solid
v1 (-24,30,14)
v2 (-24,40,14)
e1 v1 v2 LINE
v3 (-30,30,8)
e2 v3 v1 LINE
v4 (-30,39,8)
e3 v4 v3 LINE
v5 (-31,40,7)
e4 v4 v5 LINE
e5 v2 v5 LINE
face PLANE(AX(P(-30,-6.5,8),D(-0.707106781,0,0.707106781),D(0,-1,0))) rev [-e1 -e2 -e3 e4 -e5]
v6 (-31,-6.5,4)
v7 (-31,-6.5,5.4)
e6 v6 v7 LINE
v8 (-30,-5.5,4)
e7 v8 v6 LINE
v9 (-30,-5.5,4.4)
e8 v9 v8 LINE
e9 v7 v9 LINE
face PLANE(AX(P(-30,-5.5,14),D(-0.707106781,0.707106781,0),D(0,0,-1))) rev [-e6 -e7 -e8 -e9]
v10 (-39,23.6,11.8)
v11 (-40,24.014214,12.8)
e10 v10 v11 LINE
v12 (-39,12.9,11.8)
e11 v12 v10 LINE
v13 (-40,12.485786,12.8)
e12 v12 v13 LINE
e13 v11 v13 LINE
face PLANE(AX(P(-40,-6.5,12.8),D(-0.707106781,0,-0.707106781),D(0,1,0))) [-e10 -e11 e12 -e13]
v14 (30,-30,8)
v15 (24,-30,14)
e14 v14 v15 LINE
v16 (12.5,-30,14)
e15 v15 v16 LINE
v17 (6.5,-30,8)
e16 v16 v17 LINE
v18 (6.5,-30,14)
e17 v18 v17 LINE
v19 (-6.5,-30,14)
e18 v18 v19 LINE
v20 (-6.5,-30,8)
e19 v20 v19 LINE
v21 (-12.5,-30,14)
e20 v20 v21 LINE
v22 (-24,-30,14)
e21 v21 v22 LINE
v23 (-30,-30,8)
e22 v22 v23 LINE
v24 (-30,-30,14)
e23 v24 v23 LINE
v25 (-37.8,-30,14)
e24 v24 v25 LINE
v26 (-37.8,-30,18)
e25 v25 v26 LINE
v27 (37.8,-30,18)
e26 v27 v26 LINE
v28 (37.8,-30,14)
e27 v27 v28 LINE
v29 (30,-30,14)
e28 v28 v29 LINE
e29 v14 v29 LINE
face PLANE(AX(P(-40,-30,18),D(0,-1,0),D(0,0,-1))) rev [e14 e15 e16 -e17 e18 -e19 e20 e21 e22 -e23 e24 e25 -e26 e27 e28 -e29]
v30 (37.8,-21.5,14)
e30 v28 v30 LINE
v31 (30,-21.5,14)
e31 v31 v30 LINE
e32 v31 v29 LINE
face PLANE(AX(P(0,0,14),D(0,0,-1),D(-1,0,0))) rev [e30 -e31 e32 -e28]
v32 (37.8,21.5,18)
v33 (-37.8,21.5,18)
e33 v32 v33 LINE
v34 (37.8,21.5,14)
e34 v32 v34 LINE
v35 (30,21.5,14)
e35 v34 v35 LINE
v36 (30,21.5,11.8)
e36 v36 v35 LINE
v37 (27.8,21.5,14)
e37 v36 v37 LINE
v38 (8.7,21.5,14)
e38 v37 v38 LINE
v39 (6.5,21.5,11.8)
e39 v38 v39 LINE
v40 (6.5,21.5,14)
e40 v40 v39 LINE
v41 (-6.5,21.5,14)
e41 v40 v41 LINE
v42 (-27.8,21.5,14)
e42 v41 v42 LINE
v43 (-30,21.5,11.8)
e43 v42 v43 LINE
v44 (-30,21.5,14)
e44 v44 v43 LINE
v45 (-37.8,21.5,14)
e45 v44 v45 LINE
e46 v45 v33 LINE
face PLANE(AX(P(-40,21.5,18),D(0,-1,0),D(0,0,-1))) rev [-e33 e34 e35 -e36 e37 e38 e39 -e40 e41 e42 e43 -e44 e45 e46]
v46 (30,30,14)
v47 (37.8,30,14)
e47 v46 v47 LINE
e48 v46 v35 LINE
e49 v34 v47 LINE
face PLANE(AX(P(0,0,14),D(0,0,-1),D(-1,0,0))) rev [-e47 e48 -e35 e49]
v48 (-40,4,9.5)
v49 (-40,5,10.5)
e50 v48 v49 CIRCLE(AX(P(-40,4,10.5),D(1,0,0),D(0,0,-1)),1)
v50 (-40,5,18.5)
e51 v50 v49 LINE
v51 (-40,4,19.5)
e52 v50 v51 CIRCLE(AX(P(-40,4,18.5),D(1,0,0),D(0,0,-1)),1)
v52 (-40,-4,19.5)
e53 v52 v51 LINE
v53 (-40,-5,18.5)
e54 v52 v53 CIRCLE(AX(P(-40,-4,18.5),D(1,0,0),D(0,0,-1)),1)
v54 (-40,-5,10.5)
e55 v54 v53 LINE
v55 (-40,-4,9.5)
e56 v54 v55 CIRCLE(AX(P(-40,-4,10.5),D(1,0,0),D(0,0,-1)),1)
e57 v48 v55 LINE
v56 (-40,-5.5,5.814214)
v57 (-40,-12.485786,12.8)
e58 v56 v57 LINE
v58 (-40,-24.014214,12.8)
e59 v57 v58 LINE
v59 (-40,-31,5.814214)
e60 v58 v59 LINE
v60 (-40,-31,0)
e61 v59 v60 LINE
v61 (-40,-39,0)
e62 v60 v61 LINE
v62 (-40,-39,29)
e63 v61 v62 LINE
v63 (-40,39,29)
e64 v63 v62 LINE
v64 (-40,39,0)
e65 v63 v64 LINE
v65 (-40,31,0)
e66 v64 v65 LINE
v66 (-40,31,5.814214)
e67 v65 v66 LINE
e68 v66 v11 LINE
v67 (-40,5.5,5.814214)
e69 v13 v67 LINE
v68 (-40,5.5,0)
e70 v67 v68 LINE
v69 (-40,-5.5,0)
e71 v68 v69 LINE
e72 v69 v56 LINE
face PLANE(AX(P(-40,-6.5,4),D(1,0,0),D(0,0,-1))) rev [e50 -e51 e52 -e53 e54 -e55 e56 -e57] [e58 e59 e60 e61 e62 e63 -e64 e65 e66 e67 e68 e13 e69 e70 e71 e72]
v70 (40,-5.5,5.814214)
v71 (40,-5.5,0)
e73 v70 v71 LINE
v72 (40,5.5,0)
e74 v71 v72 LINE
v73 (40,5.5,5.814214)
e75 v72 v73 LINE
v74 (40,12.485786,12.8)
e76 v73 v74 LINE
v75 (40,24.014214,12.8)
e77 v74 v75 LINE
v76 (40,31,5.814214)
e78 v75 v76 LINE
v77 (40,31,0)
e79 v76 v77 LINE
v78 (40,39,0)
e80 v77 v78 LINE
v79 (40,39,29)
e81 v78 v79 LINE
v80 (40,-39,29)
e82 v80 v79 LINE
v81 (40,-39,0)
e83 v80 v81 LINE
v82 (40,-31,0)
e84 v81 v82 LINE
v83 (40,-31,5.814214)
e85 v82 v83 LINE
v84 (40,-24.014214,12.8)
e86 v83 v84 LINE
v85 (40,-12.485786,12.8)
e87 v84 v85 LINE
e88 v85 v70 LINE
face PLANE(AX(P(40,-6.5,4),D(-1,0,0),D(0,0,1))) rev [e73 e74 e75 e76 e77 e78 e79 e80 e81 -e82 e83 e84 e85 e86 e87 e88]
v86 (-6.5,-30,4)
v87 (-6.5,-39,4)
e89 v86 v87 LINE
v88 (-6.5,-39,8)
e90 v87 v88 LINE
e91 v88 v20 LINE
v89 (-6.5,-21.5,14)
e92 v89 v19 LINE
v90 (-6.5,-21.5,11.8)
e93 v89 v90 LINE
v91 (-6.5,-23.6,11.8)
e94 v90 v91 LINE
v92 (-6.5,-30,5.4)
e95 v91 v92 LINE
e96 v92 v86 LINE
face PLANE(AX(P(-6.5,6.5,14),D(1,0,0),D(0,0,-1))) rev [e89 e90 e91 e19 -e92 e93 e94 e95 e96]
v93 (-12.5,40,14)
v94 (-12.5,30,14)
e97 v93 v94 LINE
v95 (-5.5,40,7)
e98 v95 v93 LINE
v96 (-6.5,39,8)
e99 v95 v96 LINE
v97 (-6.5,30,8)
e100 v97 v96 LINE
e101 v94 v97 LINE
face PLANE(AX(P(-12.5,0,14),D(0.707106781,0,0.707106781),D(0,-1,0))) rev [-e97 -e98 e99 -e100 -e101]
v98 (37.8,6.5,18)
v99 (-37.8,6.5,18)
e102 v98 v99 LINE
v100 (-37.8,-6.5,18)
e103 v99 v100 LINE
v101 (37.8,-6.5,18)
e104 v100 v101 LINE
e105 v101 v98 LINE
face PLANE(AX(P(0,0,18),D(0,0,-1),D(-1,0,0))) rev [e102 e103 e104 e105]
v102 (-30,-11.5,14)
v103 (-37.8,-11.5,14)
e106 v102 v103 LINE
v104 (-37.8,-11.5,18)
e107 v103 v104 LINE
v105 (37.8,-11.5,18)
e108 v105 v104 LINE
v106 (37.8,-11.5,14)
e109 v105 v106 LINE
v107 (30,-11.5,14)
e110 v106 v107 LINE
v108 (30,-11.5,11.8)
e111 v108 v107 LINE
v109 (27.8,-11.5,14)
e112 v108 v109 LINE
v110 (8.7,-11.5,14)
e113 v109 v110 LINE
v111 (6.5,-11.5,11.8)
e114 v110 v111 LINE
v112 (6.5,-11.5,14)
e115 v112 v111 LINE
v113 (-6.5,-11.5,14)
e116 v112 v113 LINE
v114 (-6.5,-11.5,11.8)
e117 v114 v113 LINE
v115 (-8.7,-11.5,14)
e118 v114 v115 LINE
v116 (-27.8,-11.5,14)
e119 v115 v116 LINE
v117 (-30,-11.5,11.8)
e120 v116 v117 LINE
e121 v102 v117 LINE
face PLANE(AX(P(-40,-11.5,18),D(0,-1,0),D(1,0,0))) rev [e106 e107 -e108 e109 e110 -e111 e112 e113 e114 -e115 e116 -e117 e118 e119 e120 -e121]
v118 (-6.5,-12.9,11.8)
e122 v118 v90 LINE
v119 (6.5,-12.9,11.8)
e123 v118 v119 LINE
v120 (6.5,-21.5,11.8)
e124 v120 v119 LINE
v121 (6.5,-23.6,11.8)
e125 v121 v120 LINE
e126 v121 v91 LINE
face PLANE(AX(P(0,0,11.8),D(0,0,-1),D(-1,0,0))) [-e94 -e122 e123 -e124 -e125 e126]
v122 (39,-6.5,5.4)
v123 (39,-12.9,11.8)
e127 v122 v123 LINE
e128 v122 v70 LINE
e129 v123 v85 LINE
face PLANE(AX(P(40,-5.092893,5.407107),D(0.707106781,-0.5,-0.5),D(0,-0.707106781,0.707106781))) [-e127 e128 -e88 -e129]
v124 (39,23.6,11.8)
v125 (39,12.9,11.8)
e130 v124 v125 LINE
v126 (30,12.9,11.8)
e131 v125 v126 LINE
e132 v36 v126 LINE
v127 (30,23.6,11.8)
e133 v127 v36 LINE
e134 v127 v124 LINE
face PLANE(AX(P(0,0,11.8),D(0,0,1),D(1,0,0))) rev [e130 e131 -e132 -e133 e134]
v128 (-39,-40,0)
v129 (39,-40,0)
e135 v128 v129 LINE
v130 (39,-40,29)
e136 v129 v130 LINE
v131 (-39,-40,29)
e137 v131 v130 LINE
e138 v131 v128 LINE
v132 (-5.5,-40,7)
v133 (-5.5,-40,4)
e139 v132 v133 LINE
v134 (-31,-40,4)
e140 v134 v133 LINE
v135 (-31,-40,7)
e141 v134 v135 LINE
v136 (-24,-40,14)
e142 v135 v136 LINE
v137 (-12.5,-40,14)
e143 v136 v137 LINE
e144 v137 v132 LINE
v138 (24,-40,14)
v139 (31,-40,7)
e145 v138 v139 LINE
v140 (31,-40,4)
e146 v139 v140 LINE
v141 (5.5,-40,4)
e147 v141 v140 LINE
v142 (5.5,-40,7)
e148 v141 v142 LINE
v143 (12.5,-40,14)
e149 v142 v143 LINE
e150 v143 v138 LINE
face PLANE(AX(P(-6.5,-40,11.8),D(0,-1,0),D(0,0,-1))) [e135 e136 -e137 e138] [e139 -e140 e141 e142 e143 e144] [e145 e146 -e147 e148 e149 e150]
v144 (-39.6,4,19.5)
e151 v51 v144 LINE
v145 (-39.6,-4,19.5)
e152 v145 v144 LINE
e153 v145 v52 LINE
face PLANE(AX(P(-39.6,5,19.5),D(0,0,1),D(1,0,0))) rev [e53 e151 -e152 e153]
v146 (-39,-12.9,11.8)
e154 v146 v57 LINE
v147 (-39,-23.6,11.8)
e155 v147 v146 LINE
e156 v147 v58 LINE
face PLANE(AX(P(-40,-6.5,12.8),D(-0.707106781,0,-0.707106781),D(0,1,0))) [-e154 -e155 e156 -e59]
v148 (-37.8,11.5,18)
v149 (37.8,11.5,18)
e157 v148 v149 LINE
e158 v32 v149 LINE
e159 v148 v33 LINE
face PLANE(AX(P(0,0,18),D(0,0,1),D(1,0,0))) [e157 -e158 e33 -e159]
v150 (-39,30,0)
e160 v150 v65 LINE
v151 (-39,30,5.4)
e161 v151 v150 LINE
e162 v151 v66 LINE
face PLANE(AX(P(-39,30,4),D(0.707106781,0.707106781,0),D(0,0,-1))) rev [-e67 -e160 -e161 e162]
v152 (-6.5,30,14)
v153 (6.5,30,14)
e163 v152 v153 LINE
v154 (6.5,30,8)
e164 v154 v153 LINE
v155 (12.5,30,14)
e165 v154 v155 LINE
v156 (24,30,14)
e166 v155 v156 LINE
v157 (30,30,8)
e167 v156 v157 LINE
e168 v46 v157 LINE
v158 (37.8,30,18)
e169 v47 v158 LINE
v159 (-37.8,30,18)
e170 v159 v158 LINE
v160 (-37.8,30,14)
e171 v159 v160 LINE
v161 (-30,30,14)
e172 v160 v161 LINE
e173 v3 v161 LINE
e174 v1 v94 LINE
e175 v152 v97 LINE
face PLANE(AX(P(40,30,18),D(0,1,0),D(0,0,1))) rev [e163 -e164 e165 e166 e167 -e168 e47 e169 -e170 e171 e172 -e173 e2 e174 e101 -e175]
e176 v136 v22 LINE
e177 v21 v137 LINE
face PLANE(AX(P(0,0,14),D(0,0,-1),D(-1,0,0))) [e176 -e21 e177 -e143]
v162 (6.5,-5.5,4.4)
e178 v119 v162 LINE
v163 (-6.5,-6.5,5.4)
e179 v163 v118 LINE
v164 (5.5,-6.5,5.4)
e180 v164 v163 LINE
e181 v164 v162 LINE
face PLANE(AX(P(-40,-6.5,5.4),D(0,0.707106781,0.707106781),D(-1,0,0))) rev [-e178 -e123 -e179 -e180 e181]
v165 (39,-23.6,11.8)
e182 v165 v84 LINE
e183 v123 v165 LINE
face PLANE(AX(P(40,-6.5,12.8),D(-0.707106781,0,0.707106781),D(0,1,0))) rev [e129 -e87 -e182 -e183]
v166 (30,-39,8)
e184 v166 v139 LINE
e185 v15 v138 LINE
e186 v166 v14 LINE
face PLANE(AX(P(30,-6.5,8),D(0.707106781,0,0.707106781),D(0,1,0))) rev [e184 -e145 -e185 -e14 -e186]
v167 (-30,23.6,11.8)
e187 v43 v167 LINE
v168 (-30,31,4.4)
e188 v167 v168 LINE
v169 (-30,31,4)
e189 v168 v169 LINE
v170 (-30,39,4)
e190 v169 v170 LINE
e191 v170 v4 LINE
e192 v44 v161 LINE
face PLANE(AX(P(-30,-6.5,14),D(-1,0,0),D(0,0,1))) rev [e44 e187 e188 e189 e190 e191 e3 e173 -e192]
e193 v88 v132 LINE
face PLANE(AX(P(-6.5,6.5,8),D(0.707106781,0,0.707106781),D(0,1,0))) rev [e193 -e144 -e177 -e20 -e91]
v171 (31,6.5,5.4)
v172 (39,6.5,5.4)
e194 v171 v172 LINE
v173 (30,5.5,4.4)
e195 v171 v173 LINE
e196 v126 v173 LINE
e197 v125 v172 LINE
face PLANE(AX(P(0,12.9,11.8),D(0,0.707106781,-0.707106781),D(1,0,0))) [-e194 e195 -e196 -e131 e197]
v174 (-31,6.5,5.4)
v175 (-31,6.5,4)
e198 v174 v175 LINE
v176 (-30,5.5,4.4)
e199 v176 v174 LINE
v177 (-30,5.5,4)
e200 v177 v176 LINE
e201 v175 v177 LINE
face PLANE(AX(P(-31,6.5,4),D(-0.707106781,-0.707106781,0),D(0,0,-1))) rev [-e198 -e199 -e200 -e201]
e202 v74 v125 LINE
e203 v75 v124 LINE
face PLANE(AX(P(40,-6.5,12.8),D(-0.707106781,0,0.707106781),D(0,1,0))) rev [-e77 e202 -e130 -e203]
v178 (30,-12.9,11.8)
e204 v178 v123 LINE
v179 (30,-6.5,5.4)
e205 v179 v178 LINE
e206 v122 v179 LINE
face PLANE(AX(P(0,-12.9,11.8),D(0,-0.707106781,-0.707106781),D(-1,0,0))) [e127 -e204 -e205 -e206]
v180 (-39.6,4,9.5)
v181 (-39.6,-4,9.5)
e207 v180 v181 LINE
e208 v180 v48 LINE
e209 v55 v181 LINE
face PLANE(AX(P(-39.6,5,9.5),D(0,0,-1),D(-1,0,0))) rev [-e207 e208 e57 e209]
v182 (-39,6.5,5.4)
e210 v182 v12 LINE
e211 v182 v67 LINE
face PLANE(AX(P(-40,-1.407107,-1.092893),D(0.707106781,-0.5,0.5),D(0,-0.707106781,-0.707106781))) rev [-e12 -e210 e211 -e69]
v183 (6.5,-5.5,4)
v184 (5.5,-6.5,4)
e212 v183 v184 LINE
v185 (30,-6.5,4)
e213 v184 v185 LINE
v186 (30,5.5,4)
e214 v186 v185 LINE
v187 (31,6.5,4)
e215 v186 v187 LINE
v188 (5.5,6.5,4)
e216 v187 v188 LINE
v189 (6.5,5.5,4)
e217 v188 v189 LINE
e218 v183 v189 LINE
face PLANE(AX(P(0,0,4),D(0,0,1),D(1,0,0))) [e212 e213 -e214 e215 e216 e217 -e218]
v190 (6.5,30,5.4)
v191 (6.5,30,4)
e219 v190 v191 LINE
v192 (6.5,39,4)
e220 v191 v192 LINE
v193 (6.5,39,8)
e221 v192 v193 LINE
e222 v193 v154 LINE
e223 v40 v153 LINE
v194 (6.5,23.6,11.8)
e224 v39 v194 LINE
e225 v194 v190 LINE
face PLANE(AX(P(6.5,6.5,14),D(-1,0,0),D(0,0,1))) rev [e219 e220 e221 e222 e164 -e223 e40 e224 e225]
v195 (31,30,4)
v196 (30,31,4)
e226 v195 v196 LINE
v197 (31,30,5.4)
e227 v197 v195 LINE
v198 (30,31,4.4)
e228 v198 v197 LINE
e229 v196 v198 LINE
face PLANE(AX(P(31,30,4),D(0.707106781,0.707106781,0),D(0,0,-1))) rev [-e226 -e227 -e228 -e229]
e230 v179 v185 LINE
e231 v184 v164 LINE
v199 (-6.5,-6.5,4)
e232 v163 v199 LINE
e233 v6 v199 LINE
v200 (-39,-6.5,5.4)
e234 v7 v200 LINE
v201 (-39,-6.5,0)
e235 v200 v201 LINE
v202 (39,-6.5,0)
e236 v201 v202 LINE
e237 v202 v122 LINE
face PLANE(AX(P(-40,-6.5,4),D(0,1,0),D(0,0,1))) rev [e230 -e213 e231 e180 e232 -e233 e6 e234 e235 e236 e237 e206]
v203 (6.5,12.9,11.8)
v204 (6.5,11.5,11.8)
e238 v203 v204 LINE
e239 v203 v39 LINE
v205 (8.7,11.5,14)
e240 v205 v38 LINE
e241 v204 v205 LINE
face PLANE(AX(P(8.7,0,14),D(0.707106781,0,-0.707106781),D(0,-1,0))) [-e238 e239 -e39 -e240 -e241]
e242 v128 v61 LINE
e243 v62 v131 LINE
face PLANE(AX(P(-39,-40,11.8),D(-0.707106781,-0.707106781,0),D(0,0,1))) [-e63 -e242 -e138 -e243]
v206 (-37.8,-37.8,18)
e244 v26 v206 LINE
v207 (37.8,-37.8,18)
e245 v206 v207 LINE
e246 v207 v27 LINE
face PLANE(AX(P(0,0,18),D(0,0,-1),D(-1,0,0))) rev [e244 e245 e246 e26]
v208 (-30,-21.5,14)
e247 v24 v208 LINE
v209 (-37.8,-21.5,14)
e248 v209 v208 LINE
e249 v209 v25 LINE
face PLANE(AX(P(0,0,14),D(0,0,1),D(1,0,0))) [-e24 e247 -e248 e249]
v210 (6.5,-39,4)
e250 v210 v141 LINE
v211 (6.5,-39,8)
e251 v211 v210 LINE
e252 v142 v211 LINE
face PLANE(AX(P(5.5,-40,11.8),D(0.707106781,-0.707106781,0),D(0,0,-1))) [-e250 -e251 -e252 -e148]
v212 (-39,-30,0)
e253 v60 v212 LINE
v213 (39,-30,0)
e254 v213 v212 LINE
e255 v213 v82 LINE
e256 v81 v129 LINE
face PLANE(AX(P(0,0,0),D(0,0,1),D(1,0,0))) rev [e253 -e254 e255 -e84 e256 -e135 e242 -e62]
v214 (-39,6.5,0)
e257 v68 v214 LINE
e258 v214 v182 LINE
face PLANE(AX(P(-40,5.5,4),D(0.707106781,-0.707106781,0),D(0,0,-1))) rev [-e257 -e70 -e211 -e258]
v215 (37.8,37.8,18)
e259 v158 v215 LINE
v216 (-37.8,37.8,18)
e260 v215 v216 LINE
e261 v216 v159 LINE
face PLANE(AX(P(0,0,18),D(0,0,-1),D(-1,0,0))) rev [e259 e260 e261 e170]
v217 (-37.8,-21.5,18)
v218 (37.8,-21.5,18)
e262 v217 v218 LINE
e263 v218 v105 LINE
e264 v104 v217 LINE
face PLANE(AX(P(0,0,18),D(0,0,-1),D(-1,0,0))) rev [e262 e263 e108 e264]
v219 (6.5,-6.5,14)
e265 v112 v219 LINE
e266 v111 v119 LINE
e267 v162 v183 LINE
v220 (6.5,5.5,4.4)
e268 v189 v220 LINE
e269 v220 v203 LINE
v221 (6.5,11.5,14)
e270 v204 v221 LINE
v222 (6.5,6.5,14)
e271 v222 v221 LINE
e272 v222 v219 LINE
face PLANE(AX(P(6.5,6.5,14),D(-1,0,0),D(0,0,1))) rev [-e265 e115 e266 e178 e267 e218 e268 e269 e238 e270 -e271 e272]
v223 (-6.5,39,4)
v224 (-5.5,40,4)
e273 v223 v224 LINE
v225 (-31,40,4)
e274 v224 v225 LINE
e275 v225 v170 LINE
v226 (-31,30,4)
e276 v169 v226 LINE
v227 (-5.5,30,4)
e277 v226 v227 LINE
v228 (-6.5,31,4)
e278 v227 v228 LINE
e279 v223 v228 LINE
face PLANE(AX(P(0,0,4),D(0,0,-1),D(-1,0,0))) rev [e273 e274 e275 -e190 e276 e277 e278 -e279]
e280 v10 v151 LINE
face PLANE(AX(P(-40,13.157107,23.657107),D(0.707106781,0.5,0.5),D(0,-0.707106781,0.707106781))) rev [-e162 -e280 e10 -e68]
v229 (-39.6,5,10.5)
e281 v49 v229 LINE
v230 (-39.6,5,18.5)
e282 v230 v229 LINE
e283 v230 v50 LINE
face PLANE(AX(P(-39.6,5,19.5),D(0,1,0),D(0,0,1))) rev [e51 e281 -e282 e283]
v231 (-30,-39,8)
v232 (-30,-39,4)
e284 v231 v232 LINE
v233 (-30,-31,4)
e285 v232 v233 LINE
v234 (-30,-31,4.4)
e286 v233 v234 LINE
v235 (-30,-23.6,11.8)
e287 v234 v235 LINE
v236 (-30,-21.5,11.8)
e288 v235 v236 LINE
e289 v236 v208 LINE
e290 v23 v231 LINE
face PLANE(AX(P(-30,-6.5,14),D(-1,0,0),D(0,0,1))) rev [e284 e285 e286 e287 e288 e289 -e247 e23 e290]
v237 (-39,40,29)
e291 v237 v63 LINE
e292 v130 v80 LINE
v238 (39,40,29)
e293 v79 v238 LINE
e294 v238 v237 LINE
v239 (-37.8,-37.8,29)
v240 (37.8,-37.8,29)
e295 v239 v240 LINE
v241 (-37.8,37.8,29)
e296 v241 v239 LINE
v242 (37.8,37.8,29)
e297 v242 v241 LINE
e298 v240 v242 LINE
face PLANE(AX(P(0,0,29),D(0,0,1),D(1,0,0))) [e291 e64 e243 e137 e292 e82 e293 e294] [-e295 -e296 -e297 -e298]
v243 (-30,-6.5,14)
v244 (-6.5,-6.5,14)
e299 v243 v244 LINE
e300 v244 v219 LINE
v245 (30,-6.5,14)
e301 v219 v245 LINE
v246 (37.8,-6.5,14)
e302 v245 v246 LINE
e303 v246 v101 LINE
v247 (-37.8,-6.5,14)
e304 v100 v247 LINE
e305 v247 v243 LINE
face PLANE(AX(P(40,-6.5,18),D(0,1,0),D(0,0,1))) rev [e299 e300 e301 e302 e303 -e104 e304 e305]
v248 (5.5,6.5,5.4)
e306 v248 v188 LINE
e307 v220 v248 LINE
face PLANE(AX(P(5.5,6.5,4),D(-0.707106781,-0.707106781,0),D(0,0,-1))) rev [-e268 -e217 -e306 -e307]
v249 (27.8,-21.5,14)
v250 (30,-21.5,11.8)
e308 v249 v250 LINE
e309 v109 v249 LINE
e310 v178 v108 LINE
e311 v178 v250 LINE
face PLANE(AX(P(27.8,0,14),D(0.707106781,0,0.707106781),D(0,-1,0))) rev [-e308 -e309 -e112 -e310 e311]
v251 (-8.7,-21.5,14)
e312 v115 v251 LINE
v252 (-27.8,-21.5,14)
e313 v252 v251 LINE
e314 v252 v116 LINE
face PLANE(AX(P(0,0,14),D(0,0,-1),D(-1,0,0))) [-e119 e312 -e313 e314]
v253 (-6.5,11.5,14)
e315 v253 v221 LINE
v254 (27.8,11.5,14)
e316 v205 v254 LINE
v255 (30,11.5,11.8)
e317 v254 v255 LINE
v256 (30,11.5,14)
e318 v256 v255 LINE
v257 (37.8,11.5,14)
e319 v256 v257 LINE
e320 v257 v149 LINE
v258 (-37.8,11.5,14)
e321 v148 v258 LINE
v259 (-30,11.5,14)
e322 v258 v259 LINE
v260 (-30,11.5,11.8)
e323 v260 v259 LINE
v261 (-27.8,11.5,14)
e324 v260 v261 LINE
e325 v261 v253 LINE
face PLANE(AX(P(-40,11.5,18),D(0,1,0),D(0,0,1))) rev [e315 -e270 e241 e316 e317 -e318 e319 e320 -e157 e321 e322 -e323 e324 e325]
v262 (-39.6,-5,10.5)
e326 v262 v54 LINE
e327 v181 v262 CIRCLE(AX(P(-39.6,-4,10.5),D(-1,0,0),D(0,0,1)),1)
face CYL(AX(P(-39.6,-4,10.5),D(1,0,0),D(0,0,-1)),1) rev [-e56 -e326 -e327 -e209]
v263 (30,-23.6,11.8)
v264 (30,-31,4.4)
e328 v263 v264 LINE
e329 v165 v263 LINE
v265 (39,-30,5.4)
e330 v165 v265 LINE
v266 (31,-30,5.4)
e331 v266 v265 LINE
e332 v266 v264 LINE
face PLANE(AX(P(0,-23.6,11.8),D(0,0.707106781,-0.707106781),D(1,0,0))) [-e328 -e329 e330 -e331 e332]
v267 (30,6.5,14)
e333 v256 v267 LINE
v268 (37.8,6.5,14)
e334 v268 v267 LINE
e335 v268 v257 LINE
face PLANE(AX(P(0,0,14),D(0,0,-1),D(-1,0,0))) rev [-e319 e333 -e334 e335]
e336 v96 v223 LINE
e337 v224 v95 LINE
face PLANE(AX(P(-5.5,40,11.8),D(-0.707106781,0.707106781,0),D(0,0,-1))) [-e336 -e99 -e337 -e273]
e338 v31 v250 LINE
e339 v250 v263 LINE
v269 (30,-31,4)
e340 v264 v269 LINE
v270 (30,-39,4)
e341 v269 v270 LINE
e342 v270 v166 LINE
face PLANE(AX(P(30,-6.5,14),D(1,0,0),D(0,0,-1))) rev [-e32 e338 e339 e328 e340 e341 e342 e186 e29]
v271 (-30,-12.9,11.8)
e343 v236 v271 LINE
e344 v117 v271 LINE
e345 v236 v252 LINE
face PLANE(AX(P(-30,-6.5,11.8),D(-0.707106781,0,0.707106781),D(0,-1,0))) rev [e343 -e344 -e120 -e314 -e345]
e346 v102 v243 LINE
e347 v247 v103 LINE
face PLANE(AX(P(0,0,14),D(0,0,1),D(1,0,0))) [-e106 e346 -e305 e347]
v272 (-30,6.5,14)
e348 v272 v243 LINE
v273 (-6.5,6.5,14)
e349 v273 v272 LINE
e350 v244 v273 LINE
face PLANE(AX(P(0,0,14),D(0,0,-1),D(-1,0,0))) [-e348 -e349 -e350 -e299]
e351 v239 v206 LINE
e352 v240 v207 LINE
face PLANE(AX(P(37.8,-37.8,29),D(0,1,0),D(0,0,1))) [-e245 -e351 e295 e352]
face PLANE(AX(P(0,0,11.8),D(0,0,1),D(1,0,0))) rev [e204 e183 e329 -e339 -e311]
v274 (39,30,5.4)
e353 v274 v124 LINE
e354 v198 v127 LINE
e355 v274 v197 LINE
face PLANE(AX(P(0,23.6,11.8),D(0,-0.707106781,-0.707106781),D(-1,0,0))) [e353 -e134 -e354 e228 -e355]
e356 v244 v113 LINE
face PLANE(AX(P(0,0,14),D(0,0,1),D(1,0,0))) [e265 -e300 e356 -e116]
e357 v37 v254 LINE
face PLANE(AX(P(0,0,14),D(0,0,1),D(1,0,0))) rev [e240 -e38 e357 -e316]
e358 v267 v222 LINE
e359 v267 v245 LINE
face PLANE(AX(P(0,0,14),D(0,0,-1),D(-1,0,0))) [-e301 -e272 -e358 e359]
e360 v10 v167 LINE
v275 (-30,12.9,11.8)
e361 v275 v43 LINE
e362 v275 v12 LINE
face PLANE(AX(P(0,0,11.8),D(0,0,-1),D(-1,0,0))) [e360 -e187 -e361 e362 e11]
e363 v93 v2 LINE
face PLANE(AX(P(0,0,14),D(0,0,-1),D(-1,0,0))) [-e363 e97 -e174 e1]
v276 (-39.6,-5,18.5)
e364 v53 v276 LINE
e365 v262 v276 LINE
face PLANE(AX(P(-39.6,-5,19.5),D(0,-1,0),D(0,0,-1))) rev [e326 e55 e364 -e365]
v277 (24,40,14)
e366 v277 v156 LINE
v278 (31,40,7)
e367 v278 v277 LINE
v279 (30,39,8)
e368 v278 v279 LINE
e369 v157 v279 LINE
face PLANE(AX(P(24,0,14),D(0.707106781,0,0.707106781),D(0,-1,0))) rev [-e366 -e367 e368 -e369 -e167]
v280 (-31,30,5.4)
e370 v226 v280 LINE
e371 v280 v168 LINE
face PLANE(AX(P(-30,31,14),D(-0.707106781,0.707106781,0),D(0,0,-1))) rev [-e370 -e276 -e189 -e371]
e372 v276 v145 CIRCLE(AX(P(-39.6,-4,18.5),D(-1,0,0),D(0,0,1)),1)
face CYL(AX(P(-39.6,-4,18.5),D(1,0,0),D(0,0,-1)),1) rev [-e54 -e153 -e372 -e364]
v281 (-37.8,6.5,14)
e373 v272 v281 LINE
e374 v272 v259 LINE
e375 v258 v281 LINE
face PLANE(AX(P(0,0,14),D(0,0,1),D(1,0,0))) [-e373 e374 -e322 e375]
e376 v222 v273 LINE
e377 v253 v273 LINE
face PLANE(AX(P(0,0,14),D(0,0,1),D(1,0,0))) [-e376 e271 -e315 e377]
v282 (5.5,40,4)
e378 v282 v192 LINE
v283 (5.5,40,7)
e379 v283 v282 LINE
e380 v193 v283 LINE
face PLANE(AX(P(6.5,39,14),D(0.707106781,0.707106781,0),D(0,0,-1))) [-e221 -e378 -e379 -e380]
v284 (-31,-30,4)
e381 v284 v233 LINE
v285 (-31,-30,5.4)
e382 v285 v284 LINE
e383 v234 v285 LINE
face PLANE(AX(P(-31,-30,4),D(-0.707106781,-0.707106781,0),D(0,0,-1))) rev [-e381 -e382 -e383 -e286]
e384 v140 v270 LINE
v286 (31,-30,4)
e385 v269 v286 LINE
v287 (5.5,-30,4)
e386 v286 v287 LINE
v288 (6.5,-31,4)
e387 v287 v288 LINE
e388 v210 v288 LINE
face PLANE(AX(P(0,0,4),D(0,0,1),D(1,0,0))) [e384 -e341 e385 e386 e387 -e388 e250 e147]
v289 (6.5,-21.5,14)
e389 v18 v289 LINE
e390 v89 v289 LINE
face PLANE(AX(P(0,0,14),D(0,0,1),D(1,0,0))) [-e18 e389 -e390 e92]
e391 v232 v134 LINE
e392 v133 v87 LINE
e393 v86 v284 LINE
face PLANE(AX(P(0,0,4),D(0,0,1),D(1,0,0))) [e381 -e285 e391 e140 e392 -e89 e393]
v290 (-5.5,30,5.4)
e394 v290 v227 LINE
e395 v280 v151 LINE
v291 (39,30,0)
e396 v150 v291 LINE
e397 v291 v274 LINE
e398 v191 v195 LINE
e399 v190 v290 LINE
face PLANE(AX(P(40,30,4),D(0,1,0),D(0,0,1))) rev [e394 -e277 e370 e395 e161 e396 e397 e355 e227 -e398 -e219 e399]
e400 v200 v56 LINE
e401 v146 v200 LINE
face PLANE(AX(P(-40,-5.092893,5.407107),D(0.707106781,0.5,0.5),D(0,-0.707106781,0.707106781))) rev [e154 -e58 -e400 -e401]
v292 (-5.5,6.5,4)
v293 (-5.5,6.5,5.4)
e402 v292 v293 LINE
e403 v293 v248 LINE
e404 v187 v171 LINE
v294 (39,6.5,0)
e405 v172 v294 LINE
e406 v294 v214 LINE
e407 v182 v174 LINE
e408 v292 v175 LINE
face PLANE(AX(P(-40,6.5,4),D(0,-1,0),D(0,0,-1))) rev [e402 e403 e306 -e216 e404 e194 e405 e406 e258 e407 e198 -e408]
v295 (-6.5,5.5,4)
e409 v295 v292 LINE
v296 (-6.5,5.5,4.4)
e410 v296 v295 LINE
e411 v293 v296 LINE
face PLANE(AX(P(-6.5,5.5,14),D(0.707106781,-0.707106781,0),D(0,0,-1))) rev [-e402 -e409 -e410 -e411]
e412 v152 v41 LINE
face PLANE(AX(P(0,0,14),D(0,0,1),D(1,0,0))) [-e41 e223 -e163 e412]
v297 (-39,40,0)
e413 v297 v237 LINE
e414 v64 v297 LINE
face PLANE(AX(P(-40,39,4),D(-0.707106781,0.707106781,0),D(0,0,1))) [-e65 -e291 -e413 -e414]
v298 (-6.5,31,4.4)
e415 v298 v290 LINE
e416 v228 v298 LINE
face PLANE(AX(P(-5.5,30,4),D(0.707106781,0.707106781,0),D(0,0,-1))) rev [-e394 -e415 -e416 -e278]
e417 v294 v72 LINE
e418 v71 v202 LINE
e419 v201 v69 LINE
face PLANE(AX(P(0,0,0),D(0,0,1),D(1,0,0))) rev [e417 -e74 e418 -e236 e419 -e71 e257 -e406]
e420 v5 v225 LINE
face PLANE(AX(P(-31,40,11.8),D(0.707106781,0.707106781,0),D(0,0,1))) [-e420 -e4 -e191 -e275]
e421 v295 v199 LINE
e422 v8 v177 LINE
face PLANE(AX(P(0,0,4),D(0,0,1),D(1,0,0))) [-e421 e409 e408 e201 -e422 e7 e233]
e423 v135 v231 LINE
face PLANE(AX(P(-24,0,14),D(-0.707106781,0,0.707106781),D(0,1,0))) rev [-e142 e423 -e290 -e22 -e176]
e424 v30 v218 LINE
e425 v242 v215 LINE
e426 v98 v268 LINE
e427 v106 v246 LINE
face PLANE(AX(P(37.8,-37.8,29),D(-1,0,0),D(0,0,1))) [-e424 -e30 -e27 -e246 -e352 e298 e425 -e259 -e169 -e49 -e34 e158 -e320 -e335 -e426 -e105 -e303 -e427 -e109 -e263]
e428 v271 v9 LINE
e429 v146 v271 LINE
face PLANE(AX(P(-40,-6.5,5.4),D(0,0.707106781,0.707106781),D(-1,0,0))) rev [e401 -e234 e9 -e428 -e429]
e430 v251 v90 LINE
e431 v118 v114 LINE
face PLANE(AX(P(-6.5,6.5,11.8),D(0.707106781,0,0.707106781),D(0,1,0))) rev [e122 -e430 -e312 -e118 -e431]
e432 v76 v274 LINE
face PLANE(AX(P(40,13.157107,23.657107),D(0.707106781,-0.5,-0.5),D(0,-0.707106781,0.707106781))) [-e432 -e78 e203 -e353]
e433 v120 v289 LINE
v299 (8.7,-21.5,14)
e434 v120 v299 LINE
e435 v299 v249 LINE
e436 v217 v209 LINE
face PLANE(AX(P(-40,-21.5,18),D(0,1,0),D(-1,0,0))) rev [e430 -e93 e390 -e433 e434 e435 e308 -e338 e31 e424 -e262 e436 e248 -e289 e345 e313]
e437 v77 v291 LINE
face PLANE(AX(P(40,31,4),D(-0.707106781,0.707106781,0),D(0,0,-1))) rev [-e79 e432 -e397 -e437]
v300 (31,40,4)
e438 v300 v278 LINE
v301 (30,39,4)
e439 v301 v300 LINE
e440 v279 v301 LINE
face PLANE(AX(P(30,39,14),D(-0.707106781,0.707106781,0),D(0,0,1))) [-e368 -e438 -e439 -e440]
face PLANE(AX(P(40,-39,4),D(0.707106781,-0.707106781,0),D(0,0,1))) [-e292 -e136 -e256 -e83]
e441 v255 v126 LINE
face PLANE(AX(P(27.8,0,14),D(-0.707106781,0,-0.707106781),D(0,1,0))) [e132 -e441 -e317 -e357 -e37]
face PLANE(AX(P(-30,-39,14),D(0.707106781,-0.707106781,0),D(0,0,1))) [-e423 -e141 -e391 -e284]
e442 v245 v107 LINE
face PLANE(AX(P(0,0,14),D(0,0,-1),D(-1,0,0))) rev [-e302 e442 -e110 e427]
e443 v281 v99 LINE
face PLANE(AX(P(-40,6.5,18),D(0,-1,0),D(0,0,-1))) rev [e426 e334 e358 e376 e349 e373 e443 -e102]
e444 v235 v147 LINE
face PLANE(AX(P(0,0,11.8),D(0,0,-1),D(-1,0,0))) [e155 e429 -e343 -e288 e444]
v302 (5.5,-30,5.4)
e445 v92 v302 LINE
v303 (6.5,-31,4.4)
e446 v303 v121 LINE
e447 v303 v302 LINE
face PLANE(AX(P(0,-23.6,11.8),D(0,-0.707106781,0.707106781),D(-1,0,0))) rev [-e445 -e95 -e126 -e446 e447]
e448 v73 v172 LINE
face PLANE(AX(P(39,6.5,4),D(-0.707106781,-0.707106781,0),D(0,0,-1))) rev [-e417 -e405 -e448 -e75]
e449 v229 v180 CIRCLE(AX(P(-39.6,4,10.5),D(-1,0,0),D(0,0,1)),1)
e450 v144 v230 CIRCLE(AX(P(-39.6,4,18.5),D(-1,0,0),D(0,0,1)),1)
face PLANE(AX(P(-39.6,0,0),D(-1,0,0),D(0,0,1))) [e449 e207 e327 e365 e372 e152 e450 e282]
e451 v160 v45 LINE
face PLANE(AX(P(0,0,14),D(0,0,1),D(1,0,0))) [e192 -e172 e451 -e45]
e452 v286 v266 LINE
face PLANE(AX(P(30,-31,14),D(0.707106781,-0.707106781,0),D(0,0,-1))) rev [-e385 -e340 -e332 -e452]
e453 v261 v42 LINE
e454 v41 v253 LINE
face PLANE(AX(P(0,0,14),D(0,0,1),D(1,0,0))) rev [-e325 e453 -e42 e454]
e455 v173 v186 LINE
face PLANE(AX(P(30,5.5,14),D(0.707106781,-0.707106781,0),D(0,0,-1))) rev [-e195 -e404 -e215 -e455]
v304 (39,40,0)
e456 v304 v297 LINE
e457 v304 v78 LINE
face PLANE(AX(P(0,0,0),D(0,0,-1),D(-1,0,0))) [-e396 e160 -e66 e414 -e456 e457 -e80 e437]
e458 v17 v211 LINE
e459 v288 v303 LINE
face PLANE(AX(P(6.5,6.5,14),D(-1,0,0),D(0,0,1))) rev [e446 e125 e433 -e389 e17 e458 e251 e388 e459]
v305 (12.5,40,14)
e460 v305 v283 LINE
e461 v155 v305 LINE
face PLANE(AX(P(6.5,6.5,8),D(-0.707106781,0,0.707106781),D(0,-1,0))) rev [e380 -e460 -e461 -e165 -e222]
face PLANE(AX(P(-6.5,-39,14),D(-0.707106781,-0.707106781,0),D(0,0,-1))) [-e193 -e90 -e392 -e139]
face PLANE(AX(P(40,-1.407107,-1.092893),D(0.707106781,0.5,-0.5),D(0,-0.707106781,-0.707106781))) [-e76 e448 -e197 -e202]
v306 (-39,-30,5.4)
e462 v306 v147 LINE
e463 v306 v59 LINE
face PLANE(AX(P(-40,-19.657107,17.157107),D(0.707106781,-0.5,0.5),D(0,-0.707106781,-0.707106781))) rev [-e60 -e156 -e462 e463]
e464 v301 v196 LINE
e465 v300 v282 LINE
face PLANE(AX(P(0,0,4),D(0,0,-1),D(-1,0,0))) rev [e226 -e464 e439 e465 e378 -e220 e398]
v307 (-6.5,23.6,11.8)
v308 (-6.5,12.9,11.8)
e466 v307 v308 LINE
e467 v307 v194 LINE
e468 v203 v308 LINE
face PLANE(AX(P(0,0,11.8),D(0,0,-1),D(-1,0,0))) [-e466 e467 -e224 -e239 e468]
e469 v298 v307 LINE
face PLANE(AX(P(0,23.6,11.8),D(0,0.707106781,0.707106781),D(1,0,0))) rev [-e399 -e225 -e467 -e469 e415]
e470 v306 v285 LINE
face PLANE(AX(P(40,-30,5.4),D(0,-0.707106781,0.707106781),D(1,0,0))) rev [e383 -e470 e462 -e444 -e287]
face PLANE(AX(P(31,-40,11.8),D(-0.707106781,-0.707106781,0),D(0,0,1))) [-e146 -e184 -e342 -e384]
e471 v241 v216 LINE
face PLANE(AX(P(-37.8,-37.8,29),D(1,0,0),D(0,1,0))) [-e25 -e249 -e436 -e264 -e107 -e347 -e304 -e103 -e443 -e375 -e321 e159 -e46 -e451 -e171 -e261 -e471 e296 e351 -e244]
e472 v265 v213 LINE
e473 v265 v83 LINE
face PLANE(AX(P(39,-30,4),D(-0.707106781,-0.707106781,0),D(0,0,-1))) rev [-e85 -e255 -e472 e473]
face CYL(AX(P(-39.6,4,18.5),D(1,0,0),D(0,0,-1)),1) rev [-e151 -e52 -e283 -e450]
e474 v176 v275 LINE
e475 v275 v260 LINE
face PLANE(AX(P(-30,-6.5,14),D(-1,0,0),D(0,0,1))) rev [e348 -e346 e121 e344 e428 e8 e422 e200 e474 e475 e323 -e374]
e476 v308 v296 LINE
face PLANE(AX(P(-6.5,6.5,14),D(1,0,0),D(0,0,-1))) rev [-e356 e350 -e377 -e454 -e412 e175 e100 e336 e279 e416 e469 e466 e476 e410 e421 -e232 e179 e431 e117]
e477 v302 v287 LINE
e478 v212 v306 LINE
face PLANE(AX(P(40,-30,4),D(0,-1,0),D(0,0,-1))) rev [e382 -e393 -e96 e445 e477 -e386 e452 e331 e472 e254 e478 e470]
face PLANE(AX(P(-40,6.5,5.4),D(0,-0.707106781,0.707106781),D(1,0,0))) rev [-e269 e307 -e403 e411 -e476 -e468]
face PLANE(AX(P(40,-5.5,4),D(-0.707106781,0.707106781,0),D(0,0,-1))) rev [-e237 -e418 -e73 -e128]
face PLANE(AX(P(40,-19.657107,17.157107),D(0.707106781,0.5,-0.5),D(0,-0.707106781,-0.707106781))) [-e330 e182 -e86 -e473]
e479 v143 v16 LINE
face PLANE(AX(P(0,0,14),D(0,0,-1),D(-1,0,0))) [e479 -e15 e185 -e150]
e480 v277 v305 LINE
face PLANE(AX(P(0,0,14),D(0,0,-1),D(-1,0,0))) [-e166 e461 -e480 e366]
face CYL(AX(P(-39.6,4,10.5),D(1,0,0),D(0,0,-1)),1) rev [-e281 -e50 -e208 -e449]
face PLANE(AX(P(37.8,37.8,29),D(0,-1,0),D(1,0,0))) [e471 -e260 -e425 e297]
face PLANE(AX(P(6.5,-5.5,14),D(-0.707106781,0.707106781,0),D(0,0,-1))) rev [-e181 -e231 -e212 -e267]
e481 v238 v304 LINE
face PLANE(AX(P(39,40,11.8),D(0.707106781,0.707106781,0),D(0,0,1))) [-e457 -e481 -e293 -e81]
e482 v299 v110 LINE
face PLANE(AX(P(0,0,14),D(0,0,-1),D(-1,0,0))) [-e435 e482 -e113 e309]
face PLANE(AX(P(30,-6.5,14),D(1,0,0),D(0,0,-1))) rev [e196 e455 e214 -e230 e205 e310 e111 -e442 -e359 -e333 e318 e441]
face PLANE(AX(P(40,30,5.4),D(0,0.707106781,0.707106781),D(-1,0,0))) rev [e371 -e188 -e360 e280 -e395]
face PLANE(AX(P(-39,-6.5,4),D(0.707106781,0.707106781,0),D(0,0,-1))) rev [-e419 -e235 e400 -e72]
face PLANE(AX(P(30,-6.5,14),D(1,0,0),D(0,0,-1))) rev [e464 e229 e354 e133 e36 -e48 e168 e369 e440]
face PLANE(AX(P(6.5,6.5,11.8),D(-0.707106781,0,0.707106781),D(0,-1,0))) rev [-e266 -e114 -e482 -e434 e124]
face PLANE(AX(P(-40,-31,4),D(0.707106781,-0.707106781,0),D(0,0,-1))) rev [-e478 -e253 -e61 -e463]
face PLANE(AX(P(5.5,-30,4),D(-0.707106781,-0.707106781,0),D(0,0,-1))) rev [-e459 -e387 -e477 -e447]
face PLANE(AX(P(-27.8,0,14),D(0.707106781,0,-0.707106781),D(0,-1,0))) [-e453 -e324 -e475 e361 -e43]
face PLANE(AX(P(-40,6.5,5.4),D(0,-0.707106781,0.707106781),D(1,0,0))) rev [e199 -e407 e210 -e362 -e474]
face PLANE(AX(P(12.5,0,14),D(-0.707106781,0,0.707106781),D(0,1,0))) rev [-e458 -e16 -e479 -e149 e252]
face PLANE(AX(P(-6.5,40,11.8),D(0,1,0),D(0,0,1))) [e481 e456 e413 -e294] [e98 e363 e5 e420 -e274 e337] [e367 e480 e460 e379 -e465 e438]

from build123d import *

# Parameters (mm, degrees)
CROQUIS1_W                = 13
CROQUIS1_H                = 80
SALIENTE_EXTRUIR1_DEPTH   = 4
CROQUIS1_W_2              = 10
SALIENTE_EXTRUIR1_2_DEPTH = 4
SALIENTE_EXTRUIR1_3_DEPTH = 4
CROQUIS2_W                = 13
CROQUIS2_H                = 13
CROQUIS2_W_2              = 10
CROQUIS2_H_2              = 10
SALIENTE_EXTRUIR2_DEPTH   = 10
CROQUIS3_W                = 13
CROQUIS3_H                = 80
CROQUIS3_W_2              = 10
SALIENTE_EXTRUIR3_DEPTH   = 2.2
CROQUIS4_W                = 80
CROQUIS4_H                = 10
CROQUIS4_H_2              = 13
SALIENTE_EXTRUIR4_DEPTH   = 4
CROQUIS5_W                = 80
CROQUIS5_H                = 80
CROQUIS5_W_2              = 75.6
CROQUIS5_H_2              = 75.6
SALIENTE_EXTRUIR5_DEPTH   = 15
CHAFL_N2_SIZE             = 6.4
CHAFL_N3_SIZE             = 6
CHAFL_N4_SIZE             = 2.2
CROQUIS6_W                = 10
CROQUIS6_H                = 10
CORTAR_EXTRUIR1_DEPTH     = 0.4
REDONDEO1_R               = 1
CHAFL_N1_SIZE             = 1


with BuildPart() as part:
    # Croquis1 → Saliente-Extruir1 (new body)
    with BuildSketch(Plane(origin=(0, 0, 0), x_dir=(0, 1, 0), z_dir=(0, 0, 1))):
        Rectangle(CROQUIS1_W, CROQUIS1_H)
    extrude(amount=SALIENTE_EXTRUIR1_DEPTH)



with BuildPart() as body_2:
    # Croquis1 → Saliente-Extruir1 2 (new body)
    with BuildSketch(Plane(origin=(0, 0, 0), x_dir=(0, 1, 0), z_dir=(0, 0, 1))):
        with Locations((35, 0)):
            Rectangle(CROQUIS1_W_2, CROQUIS1_H)
    extrude(amount=SALIENTE_EXTRUIR1_2_DEPTH)


with BuildPart() as body_3:
    # Croquis1 → Saliente-Extruir1 3 (new body)
    with BuildSketch(Plane(origin=(0, 0, 0), x_dir=(0, 1, 0), z_dir=(0, 0, 1))):
        with Locations((-35, 0)):
            Rectangle(CROQUIS1_W_2, CROQUIS1_H)
    extrude(amount=SALIENTE_EXTRUIR1_3_DEPTH)


with BuildPart() as part_1:
    add(part.part)

    add(body_2.part)  # Saliente-Extruir2 merges body 2

    add(body_3.part)  # Saliente-Extruir2 merges body 3
    # Croquis2 → Saliente-Extruir2 (add)
    with BuildSketch(Plane.XY.offset(4)):
        Rectangle(CROQUIS2_W, CROQUIS2_H)
        with Locations((-35, 0)):
            Rectangle(CROQUIS2_W_2, CROQUIS2_H)
        with Locations((35, 0)):
            Rectangle(CROQUIS2_W_2, CROQUIS2_H)
        with Locations((0, 35)):
            Rectangle(CROQUIS2_W, CROQUIS2_H_2)
        with Locations((-35, 35)):
            Rectangle(CROQUIS2_W_2, CROQUIS2_H_2)
        with Locations((35, 35)):
            Rectangle(CROQUIS2_W_2, CROQUIS2_H_2)
        with Locations((35, -35)):
            Rectangle(CROQUIS2_W_2, CROQUIS2_H_2)
        with Locations((-35, -35)):
            Rectangle(CROQUIS2_W_2, CROQUIS2_H_2)
        with Locations((0, -35)):
            Rectangle(CROQUIS2_W, CROQUIS2_H_2)
    extrude(amount=SALIENTE_EXTRUIR2_DEPTH)

    # Croquis3 → Saliente-Extruir3 (add)
    with BuildSketch(Plane.XY.offset(14)):
        Rectangle(CROQUIS3_W, CROQUIS3_H)
        with Locations((-35, 0)):
            Rectangle(CROQUIS3_W_2, CROQUIS3_H)
        with Locations((35, 0)):
            Rectangle(CROQUIS3_W_2, CROQUIS3_H)
    extrude(amount=-SALIENTE_EXTRUIR3_DEPTH)

    # Croquis4 → Saliente-Extruir4 (add)
    with BuildSketch(Plane.XY.offset(14)):
        with Locations((0, -35)):
            Rectangle(CROQUIS4_W, CROQUIS4_H)
        Rectangle(CROQUIS4_W, CROQUIS4_H_2)
        with Locations((0, 35)):
            Rectangle(CROQUIS4_W, CROQUIS4_H)
        with Locations((0, 16.5)):
            Rectangle(CROQUIS4_W, CROQUIS4_H)
        with Locations((0, -16.5)):
            Rectangle(CROQUIS4_W, CROQUIS4_H)
    extrude(amount=SALIENTE_EXTRUIR4_DEPTH)

    # Croquis5 → Saliente-Extruir5 (add)
    with BuildSketch(Plane.XY.offset(14)):
        Rectangle(CROQUIS5_W, CROQUIS5_H)
        Rectangle(CROQUIS5_W_2, CROQUIS5_H_2, mode=Mode.SUBTRACT)
    extrude(amount=SALIENTE_EXTRUIR5_DEPTH)

    # Chaflán2
    chafl_n2_edges = [part_1.edges().sort_by_distance(p)[0] for p in [
        (0, -30, 11.8),
        (-35, 6.5, 11.8),
        (-35, -6.5, 11.8),
        (-35, 30, 11.8),
        (-35, -30, 11.8),
        (35, 6.5, 11.8),
        (35, 30, 11.8),
        (35, -6.5, 11.8),
        (35, -30, 11.8),
        (0, 6.5, 11.8),
        (0, -6.5, 11.8),
        (0, 30, 11.8),
    ]]
    chamfer(chafl_n2_edges, length=CHAFL_N2_SIZE)

    # Chaflán3
    chafl_n3_edges = [part_1.edges().sort_by_distance(p)[0] for p in [
        (-6.5, -35, 14),
        (30, -35, 14),
        (6.5, 35, 14),
        (-30, 35, 14),
        (6.5, -35, 14),
        (-6.5, 35, 14),
        (-30, -35, 14),
        (30, 35, 14),
    ]]
    chamfer(chafl_n3_edges, length=CHAFL_N3_SIZE)

    # Chaflán4
    chafl_n4_edges = [part_1.edges().sort_by_distance(p)[0] for p in [
        (30, 16.5, 14),
        (30, -16.5, 14),
        (6.5, -16.5, 14),
        (-6.5, -16.5, 14),
        (-30, -16.5, 14),
        (6.5, 16.5, 14),
        (-30, 16.5, 14),
    ]]
    chamfer(chafl_n4_edges, length=CHAFL_N4_SIZE - 0.0001)  # a hair under: the kernel refuses the full size

    # Croquis6 → Cortar-Extruir1 (cut)
    with BuildSketch(Plane(origin=(-40, 0, 0), x_dir=(0, -1, 0), z_dir=(-1, 0, 0))):
        with Locations((0, 14.5)):
            Rectangle(CROQUIS6_W, CROQUIS6_H)
    extrude(amount=-CORTAR_EXTRUIR1_DEPTH, mode=Mode.SUBTRACT)

    # Redondeo1
    redondeo1_edges = [part_1.edges().sort_by_distance(p)[0] for p in [
        (-39.8, -5, 19.5),
        (-39.8, -5, 9.5),
        (-39.8, 5, 9.5),
        (-39.8, 5, 19.5),
    ]]
    fillet(redondeo1_edges, radius=REDONDEO1_R)

    # Chaflán1
    chafl_n1_edges = [part_1.edges().sort_by_distance(p)[0] for p in [
        (-40, 40, 14.5),
        (-40, -40, 14.5),
        (40, -40, 14.5),
        (40, 6.5, 2.7),
        (-40, 6.5, 2.7),
        (-30, 6.5, 4.7),
        (-6.5, 6.5, 4.7),
        (6.5, 6.5, 4.7),
        (30, 6.5, 4.7),
        (6.5, -6.5, 4.7),
        (-30, -6.5, 4.7),
        (-40, -6.5, 2.7),
        (40, -6.5, 2.7),
        (-40, -18.25, 11.8),
        (30, 30, 4.7),
        (-6.5, 30, 4.7),
        (-30, 30, 4.7),
        (-40, 30, 2.7),
        (40, 30, 2.7),
        (-40, 18.25, 11.8),
        (40, -30, 2.7),
        (-40, -30, 2.7),
        (-30, -30, 4.7),
        (6.5, -30, 4.7),
        (30, -30, 4.7),
        (40, 18.25, 11.8),
        (40, -18.25, 11.8),
        (-40, -9.7, 8.6),
        (-40, 26.8, 8.6),
        (-40, 9.7, 8.6),
        (-40, -26.8, 8.6),
        (40, 9.7, 8.6),
        (40, 26.8, 8.6),
        (40, -9.7, 8.6),
        (40, -26.8, 8.6),
        (30, 40, 6),
        (30, -40, 6),
        (-30, 40, 6),
        (-30, -40, 6),
        (6.5, 40, 6),
        (-6.5, -40, 6),
        (6.5, -40, 6),
        (-6.5, 40, 6),
        (40, 40, 14.5),
    ]]
    chamfer(chafl_n1_edges, length=CHAFL_N1_SIZE)


solid = part_1.part
